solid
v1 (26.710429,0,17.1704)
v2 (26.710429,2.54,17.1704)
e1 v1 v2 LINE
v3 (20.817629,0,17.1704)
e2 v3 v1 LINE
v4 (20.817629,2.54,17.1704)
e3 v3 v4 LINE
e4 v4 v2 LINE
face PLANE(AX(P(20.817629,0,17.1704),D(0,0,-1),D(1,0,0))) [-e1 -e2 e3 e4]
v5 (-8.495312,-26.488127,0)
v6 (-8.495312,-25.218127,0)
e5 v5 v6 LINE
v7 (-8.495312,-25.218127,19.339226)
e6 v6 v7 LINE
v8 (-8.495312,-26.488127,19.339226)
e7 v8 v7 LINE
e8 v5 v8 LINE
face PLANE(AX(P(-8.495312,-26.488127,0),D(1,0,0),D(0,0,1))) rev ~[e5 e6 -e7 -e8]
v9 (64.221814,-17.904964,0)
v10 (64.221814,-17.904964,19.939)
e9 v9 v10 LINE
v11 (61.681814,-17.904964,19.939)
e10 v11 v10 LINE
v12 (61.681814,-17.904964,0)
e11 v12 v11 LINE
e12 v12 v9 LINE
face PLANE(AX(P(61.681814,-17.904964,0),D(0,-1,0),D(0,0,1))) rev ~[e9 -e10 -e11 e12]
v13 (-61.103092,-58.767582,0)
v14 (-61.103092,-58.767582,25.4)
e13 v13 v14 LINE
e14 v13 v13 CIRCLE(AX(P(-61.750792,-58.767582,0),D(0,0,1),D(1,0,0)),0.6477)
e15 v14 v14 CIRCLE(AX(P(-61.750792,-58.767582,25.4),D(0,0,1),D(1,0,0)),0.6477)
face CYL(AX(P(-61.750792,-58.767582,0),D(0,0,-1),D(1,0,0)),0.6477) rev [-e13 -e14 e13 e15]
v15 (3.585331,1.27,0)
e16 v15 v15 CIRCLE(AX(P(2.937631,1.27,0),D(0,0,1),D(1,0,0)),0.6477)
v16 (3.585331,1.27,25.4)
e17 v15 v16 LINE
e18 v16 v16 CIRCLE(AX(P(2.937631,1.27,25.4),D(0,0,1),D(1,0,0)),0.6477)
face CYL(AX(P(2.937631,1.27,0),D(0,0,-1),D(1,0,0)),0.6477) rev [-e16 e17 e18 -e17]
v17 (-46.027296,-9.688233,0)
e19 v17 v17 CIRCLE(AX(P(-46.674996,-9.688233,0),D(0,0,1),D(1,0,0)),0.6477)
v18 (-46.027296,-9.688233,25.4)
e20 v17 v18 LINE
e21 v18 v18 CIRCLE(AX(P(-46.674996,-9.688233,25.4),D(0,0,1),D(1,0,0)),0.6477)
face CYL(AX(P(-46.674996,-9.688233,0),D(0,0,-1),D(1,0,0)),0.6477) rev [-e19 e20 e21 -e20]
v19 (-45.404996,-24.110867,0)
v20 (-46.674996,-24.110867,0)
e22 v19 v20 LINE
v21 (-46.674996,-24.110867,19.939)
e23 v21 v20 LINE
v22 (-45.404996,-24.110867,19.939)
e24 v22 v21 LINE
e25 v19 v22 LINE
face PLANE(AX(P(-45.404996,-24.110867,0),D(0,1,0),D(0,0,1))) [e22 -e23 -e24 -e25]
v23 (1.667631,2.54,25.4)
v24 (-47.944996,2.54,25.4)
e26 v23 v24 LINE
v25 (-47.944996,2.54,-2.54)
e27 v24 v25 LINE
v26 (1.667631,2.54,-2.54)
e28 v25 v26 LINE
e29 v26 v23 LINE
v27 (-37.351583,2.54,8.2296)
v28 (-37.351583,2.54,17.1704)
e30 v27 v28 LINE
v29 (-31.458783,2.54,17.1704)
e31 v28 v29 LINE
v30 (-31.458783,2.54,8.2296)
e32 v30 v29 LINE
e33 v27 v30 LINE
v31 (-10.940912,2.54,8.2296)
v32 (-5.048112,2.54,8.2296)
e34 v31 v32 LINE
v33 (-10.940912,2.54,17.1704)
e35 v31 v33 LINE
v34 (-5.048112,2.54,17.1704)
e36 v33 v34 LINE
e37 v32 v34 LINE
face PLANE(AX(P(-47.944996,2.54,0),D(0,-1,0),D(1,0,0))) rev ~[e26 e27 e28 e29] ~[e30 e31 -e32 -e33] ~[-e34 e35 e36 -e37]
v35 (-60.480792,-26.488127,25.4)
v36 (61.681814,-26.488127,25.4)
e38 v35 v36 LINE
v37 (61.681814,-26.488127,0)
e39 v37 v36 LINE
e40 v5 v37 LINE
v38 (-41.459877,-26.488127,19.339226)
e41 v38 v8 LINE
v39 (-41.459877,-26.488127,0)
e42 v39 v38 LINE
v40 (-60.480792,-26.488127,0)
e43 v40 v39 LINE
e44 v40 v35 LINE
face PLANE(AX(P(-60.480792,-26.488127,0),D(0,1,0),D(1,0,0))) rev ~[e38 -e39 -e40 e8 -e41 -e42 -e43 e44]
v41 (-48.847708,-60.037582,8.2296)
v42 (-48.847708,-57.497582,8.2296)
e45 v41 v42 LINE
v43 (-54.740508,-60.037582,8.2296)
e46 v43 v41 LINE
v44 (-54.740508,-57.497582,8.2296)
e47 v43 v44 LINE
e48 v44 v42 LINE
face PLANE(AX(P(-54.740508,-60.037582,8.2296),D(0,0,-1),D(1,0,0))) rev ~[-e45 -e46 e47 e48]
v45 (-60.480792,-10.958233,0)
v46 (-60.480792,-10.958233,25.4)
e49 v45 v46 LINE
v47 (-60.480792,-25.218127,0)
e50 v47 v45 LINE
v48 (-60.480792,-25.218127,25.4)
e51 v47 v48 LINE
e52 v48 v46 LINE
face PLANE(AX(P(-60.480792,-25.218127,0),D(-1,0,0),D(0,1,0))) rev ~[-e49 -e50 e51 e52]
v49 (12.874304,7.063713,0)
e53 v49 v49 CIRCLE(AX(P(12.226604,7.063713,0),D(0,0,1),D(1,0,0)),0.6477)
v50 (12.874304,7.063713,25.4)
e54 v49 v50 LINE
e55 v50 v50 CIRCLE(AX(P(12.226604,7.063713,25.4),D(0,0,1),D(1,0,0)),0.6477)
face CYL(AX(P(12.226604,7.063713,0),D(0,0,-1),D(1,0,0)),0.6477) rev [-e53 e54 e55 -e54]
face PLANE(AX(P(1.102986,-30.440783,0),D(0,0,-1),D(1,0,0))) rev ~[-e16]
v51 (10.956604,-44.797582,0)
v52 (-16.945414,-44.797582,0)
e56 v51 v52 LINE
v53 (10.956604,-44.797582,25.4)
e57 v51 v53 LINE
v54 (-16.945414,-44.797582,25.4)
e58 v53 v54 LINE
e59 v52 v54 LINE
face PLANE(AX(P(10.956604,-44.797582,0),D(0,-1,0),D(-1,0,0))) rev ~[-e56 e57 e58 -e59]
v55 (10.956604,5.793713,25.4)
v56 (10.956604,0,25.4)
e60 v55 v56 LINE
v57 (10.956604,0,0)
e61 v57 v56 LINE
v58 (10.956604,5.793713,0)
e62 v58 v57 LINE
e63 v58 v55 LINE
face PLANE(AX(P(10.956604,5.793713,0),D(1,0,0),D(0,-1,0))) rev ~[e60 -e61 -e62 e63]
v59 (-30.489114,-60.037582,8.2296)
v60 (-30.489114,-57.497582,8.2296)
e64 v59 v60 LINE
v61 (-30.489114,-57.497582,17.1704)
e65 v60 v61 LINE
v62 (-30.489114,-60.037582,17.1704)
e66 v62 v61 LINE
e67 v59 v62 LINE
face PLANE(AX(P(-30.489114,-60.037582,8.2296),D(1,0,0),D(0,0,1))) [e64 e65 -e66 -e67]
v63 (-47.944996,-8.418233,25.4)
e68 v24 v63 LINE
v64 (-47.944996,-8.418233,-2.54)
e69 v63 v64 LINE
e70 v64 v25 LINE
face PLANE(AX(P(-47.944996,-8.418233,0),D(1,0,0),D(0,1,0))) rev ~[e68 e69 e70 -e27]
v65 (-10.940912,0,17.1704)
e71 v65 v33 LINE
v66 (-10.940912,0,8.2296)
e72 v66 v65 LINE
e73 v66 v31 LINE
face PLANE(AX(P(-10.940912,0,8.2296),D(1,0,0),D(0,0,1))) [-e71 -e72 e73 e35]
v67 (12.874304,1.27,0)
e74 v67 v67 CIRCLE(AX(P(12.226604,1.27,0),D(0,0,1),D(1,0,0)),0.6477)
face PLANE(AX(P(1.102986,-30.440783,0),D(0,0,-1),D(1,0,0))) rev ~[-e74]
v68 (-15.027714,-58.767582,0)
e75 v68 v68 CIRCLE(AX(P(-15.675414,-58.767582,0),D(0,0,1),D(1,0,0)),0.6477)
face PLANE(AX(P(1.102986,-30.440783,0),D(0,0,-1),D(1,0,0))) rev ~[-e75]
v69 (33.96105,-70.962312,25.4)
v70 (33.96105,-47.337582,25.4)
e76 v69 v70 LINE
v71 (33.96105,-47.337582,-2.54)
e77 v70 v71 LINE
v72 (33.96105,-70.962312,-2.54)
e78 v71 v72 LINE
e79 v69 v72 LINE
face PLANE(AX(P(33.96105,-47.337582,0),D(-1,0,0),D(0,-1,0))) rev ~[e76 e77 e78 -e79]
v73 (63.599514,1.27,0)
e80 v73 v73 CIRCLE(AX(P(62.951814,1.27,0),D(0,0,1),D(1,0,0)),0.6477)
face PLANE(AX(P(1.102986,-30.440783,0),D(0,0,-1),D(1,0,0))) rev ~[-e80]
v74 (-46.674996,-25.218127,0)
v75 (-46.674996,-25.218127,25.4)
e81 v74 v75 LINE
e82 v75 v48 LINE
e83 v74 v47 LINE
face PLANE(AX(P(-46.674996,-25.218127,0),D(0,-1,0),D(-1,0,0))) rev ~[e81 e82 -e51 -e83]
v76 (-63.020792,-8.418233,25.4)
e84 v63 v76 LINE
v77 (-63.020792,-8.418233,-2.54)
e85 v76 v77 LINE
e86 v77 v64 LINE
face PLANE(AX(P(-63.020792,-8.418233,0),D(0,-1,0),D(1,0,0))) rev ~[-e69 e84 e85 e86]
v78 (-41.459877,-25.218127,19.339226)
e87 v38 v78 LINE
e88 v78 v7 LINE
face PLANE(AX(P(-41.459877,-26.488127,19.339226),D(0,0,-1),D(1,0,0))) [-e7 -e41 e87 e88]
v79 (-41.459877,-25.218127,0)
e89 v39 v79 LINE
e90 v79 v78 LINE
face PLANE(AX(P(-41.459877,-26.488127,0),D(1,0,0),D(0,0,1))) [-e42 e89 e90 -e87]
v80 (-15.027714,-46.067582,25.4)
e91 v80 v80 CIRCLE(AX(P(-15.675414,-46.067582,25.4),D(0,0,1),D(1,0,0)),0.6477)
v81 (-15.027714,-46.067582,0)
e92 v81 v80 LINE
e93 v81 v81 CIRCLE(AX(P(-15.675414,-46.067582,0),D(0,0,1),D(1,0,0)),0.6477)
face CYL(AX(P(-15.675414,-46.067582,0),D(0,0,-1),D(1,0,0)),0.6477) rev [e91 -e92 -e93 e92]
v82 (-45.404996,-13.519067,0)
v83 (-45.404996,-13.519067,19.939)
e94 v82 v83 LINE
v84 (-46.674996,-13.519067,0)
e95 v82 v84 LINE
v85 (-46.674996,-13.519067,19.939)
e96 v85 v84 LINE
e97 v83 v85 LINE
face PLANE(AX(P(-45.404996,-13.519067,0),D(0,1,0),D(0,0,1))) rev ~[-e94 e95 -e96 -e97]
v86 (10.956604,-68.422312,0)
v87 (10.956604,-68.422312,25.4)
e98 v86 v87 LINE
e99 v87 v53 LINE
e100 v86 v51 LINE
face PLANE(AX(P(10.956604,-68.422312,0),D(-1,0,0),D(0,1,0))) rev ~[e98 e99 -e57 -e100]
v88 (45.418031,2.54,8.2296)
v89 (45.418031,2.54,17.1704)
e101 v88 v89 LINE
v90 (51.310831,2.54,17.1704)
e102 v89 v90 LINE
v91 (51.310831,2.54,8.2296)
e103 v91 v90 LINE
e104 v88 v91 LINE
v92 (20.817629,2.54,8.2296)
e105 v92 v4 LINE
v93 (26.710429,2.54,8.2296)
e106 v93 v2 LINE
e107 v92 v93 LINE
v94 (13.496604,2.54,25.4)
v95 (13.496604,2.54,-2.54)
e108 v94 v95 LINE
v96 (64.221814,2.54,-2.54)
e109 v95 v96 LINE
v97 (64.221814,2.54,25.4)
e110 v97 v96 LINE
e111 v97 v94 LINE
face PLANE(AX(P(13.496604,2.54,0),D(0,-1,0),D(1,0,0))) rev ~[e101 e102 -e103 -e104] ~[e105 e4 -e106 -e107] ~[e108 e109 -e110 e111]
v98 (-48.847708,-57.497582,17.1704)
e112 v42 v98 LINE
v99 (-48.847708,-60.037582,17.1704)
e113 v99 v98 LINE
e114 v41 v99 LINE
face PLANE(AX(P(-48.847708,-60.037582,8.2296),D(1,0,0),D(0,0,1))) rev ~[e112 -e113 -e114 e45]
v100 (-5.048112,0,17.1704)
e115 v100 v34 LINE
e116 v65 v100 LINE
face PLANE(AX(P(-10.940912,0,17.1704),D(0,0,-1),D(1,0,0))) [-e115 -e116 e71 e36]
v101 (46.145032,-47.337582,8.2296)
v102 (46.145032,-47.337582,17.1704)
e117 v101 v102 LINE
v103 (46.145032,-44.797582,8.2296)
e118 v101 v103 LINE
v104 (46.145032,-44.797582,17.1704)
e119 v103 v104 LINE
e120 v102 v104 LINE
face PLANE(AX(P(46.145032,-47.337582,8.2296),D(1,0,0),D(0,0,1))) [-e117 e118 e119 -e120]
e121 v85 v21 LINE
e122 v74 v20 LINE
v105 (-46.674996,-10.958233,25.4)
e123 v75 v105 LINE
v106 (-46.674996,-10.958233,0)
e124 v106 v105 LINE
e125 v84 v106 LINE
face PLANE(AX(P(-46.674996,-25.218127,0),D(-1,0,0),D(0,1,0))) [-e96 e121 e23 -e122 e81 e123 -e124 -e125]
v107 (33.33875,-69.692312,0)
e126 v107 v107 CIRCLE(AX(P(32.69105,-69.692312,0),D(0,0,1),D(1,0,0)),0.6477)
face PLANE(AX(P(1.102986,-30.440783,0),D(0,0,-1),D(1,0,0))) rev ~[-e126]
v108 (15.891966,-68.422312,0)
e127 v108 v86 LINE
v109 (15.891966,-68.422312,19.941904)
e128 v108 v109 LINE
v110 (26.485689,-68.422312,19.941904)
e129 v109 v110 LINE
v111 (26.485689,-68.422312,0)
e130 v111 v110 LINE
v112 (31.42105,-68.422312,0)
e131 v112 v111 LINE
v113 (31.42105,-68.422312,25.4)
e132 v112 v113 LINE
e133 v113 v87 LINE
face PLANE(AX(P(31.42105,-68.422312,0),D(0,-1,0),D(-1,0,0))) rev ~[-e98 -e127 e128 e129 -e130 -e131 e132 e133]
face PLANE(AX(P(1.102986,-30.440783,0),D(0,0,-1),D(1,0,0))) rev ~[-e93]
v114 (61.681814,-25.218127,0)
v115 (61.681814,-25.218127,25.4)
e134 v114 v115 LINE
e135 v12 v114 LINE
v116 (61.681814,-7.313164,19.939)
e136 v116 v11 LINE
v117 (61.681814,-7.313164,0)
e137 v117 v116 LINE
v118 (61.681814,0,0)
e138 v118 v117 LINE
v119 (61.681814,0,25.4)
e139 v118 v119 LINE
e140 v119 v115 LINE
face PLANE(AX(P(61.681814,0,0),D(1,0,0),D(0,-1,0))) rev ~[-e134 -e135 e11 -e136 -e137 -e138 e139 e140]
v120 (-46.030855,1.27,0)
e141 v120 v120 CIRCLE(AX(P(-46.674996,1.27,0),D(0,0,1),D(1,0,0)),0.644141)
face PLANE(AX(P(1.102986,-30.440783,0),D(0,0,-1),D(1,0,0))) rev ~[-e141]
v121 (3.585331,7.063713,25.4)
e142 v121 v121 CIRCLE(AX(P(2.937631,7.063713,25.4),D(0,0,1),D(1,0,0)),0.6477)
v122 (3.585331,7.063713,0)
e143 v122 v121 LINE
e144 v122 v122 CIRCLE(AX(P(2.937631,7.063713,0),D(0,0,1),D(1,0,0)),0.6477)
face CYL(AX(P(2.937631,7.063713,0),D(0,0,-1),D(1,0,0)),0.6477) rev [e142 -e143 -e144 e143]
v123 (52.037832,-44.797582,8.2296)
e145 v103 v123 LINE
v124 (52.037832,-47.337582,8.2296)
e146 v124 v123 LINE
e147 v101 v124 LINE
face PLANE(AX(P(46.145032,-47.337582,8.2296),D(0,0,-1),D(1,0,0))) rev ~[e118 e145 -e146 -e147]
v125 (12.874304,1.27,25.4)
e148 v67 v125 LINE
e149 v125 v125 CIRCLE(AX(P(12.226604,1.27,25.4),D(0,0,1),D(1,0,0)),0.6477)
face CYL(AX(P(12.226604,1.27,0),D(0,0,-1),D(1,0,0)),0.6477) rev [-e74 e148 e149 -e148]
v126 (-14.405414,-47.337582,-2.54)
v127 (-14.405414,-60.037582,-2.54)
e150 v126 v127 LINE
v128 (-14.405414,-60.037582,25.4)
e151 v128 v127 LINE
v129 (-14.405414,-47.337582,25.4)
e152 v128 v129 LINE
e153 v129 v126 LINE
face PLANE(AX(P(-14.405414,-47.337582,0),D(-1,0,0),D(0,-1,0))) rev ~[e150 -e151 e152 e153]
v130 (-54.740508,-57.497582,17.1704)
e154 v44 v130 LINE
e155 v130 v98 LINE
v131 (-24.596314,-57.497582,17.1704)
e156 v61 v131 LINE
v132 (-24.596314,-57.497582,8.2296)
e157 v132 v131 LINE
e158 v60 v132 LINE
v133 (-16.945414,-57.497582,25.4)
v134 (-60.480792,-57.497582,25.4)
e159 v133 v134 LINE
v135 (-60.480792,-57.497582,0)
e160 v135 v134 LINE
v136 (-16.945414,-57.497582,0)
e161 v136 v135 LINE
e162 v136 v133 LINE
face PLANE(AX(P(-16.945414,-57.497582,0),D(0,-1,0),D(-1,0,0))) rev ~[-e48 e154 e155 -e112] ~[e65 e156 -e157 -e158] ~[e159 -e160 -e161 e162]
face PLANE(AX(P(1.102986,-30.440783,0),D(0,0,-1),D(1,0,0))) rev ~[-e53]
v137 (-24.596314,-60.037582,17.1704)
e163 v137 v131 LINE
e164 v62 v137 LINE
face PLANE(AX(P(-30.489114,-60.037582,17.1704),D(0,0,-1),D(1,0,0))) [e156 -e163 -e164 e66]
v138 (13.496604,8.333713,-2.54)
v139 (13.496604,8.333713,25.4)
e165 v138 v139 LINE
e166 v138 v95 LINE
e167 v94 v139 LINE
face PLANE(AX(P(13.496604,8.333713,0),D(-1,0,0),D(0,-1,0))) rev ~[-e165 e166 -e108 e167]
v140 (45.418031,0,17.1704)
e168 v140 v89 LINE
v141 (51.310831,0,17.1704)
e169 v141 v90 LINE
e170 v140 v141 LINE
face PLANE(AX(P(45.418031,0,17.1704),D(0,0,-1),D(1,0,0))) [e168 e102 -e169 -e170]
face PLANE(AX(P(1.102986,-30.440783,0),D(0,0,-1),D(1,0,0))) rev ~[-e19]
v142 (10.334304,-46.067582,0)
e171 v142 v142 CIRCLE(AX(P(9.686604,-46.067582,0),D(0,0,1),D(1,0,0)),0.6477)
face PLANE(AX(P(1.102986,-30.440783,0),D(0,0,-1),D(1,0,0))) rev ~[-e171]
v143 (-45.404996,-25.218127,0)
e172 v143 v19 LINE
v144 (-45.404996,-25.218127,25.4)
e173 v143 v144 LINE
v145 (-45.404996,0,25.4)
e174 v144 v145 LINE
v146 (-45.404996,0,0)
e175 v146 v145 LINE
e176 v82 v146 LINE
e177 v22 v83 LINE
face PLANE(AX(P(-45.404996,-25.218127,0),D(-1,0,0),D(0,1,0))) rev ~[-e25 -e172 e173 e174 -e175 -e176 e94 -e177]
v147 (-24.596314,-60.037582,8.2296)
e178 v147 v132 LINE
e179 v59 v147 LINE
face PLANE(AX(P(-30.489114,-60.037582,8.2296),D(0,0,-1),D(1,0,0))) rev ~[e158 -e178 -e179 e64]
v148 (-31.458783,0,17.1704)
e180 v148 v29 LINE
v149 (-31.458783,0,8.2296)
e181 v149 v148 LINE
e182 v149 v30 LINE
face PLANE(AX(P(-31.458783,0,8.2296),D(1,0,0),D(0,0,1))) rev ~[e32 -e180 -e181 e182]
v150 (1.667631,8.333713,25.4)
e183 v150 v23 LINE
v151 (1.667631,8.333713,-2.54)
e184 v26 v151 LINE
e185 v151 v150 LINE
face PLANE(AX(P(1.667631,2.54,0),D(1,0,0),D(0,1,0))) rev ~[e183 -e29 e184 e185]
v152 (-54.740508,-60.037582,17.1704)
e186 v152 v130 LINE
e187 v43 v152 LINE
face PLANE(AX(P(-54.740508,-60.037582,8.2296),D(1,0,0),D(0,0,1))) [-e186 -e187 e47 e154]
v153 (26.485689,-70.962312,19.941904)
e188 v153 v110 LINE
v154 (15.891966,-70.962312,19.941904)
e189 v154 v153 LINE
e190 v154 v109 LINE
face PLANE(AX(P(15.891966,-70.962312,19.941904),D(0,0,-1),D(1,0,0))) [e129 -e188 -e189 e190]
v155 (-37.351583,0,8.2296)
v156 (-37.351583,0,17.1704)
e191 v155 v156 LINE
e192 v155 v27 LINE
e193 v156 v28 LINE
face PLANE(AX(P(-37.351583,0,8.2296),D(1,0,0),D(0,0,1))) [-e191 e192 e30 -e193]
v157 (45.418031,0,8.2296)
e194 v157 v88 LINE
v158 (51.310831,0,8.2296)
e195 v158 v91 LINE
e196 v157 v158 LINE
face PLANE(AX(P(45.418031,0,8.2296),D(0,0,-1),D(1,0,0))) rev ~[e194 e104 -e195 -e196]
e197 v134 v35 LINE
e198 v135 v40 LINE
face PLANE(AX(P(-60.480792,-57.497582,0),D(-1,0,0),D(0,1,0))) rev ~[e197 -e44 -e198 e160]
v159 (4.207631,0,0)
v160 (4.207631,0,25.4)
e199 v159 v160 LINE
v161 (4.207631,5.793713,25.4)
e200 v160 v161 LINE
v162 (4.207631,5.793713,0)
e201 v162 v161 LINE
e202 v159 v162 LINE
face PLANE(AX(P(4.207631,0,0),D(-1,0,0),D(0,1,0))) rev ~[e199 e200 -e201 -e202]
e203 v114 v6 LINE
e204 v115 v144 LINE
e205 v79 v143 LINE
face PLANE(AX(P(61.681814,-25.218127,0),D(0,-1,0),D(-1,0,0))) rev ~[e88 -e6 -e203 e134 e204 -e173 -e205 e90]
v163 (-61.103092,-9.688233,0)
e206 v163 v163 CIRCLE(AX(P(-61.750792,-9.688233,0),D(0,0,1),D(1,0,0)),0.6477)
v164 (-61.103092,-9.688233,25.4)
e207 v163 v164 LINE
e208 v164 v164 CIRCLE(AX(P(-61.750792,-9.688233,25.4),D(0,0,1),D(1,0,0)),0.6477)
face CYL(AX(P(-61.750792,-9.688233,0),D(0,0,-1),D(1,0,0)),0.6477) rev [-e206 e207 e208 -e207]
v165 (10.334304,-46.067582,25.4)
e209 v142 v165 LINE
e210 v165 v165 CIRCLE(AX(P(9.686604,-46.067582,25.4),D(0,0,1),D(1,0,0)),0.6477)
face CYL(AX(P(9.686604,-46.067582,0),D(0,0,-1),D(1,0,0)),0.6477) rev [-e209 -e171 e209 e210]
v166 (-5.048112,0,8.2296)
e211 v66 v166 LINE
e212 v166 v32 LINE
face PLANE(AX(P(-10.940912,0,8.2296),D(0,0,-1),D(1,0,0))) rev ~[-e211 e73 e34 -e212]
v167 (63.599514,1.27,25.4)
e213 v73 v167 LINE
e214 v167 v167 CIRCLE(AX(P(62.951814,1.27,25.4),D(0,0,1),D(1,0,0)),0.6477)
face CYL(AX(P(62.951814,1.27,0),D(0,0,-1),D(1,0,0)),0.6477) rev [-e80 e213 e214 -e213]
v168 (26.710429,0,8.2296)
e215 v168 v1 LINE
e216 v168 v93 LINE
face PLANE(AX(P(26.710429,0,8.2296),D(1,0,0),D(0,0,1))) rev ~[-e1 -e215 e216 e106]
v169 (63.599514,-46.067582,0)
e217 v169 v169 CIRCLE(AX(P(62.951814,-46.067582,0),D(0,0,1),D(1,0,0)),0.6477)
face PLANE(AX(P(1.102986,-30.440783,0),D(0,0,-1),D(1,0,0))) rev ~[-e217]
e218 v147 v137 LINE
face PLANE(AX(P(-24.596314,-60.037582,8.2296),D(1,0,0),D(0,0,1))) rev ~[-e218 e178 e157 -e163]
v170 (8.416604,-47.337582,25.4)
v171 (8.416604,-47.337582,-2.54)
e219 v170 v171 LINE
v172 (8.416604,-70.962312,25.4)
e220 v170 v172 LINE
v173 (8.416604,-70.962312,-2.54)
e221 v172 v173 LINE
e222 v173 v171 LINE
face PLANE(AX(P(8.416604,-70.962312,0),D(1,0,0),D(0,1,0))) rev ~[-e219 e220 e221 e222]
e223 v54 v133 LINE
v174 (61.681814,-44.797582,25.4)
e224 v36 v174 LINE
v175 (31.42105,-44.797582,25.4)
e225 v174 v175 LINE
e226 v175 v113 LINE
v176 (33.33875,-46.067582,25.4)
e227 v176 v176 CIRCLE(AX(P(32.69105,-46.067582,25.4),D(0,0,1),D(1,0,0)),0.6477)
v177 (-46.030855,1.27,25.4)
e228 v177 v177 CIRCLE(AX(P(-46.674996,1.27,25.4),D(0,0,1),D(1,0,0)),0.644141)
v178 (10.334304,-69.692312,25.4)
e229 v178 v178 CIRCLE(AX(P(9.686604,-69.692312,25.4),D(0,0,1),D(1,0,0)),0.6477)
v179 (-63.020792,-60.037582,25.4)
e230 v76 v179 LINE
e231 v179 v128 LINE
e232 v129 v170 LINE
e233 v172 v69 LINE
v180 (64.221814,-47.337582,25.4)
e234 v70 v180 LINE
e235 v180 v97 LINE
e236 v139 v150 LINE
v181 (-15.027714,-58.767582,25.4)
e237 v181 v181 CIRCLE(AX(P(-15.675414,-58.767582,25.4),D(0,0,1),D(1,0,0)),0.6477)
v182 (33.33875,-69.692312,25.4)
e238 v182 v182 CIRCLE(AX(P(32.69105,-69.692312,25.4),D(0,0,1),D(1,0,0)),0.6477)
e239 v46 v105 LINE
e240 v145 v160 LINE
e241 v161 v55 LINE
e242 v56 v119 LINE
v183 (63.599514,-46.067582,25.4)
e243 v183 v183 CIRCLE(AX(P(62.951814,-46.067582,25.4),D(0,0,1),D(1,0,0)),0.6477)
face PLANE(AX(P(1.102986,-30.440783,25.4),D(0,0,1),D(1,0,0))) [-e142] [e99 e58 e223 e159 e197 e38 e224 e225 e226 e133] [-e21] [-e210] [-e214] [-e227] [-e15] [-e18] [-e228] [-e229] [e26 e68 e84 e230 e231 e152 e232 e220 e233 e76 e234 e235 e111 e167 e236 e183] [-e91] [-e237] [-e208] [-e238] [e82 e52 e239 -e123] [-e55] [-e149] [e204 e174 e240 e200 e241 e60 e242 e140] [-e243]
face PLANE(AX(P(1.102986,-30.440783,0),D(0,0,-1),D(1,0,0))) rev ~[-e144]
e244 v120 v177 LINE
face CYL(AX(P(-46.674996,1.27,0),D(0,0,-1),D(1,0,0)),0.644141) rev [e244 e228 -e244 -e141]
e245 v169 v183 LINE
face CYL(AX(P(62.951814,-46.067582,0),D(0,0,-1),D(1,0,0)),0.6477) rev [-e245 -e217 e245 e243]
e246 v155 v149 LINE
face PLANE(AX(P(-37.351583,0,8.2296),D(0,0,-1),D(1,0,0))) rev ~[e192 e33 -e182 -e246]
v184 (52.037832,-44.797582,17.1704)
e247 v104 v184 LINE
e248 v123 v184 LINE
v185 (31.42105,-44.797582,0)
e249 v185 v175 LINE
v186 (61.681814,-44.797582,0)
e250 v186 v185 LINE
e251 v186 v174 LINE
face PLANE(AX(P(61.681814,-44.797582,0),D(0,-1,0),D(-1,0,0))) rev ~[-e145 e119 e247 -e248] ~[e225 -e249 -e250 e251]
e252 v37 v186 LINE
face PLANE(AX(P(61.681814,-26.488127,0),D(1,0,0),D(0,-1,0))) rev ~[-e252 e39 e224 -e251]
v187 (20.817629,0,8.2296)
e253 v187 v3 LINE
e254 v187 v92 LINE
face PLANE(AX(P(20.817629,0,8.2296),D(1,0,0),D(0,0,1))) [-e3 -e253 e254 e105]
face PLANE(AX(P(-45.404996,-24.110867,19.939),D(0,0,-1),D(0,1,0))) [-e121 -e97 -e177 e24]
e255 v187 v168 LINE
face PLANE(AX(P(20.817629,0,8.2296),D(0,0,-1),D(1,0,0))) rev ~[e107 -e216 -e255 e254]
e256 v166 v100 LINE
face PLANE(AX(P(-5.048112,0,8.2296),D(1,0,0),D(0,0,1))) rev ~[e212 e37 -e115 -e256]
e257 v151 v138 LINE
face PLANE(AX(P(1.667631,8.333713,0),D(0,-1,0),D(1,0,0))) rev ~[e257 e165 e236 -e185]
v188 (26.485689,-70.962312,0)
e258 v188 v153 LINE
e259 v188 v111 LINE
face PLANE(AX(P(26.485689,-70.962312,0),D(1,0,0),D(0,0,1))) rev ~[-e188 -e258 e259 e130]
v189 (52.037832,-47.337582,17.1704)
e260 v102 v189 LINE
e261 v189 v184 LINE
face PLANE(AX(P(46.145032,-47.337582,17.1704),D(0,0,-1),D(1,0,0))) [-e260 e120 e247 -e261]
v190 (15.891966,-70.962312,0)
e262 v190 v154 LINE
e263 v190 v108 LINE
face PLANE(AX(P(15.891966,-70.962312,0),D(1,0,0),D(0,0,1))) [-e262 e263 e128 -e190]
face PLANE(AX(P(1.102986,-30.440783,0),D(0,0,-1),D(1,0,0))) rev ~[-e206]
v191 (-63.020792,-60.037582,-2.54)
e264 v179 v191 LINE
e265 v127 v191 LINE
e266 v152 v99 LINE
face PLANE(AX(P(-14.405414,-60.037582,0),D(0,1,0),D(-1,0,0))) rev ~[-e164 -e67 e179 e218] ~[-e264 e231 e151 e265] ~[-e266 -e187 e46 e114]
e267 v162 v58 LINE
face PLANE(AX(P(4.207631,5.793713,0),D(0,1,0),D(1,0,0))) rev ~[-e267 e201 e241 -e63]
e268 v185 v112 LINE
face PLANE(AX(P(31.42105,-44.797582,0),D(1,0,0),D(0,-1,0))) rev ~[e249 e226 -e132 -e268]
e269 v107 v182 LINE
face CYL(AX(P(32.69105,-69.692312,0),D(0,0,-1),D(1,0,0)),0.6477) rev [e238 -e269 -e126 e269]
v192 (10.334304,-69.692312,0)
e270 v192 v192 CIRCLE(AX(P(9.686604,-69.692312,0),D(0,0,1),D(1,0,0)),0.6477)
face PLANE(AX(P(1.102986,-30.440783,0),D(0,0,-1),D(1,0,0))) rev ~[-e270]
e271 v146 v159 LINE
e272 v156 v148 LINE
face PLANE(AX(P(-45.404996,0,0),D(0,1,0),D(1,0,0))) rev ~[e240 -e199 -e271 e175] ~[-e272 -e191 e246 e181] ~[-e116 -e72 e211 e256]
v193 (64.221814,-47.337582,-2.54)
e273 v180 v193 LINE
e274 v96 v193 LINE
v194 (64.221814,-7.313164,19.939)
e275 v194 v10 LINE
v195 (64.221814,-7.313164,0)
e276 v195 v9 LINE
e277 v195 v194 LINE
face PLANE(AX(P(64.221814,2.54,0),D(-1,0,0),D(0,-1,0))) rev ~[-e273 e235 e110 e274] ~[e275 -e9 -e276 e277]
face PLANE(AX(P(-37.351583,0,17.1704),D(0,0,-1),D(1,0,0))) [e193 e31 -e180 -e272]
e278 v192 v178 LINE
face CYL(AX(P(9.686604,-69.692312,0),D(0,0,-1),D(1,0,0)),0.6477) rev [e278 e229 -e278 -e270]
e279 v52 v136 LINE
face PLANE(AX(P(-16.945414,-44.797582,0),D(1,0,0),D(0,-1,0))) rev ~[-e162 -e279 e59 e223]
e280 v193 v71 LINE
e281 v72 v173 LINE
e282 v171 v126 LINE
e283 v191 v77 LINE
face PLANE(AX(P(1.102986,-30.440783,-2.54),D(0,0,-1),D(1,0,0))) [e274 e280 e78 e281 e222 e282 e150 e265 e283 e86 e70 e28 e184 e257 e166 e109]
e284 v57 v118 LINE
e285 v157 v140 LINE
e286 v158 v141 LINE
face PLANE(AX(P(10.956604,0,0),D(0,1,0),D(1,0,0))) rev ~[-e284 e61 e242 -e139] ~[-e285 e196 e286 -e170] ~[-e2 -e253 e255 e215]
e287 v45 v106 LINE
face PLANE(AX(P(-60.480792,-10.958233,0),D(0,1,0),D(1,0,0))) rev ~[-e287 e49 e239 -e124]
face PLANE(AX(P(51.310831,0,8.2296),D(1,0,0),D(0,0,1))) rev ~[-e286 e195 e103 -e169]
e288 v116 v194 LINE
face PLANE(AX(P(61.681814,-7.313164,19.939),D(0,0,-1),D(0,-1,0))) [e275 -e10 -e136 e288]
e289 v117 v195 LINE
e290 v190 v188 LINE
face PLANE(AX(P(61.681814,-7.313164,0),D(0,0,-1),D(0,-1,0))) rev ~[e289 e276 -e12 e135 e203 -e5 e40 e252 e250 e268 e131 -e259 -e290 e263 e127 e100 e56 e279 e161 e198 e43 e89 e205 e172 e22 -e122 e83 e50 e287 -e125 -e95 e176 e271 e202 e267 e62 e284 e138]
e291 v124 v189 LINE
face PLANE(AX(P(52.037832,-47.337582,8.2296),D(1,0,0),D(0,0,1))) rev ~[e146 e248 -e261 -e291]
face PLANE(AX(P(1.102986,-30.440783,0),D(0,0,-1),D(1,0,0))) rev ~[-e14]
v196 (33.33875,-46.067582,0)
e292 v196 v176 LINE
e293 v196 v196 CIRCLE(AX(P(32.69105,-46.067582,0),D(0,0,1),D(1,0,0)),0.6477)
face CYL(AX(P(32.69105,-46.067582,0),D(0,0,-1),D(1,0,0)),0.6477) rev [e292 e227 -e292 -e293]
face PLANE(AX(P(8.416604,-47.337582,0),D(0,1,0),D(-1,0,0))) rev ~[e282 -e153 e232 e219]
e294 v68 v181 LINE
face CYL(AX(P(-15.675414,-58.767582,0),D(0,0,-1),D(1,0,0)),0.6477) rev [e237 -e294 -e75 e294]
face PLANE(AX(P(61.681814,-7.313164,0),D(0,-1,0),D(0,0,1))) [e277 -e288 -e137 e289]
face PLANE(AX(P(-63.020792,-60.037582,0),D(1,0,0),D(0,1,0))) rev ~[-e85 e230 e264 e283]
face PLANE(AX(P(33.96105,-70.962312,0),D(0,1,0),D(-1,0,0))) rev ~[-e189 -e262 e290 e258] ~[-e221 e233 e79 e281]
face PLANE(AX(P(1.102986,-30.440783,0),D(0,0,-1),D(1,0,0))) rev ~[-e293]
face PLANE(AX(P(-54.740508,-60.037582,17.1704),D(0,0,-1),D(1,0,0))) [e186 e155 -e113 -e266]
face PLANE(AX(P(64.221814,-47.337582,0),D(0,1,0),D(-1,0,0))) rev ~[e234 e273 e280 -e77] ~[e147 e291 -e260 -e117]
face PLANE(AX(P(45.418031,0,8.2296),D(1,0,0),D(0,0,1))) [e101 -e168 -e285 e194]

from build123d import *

# Parameters (mm, degrees)
F0_R      = 0.6477
F0_R_2    = 0.6441405576
F0_W      = 1.27
F0_H      = 14.2598937347
F2_DEPTH  = 25.4
F12_DEPTH = 2.54
F4_W      = 5.8928
F4_H      = 8.9408
F3_W      = 5.8928
F3_H      = 8.9408
F13_DEPTH = 25.4
F6_W      = 5.8928
F6_H      = 8.9408
F5_W      = 10.5937230855
F5_H      = 19.9419036508
F7_W      = 5.8928
F7_H      = 8.9408
F14_DEPTH = 12.7
F10_W     = 10.5918
F10_H     = 19.939
F15_DEPTH = 12.7
F9_W      = 10.5918
F9_H      = 19.939
F16_DEPTH = 25.4
F8_W      = 32.9645648599
F8_H      = 19.3392261863
F17_DEPTH = 12.7


# Not quite as in the source:
# - the program builds the solid bodies; features that only make, move or delete a surface that nothing else refers to are left out


with BuildPart() as f2:
    # F0 (on Top) → F2 (new body)
    with BuildSketch(Plane.XY):
        Polygon((-45.4049956864, 2.54), (-47.9449956864, 2.54), (-47.9449956864, 0), (-47.9449956864, -8.4182334522), (-60.4807920754, -8.4182334522), (-63.0207920754, -8.4182334522), (-63.0207920754, -10.9582334522), (-63.0207920754, -57.4975824572), (-63.0207920754, -60.0375824572), (-60.4807920754, -60.0375824572), (-16.9454139954, -60.0375824572), (-14.4054139954, -60.0375824572), (-14.4054139954, -57.4975824572), (-14.4054139954, -47.3375824572), (8.416604454, -47.3375824572), (8.416604454, -68.4223124651), (8.416604454, -70.9623124651), (10.956604454, -70.9623124651), (31.4210504293, -70.9623124651), (33.9610504293, -70.9623124651), (33.9610504293, -68.4223124651), (33.9610504293, -47.3375824572), (61.6818144917, -47.3375824572), (64.2218144917, -47.3375824572), (64.2218144917, -44.7975824572), (64.2218144917, 0), (64.2218144917, 2.54), (61.6818144917, 2.54), (13.496604454, 2.54), (13.496604454, 5.7937128431), (13.496604454, 8.3337128431), (10.956604454, 8.3337128431), (4.2076310147, 8.3337128431), (1.6676310147, 8.3337128431), (1.6676310147, 5.7937128431), (1.6676310147, 2.54), align=None)
        with Locations((-61.7507920754, -58.7675824572)):
            Circle(F0_R, mode=Mode.SUBTRACT)
        with Locations((-15.6754139954, -58.7675824572)):
            Circle(F0_R, mode=Mode.SUBTRACT)
        with Locations((-15.6754139954, -46.0675824572)):
            Circle(F0_R, mode=Mode.SUBTRACT)
        with Locations((9.686604454, -69.6923124651)):
            Circle(F0_R, mode=Mode.SUBTRACT)
        with Locations((32.6910504293, -69.6923124651)):
            Circle(F0_R, mode=Mode.SUBTRACT)
        with Locations((9.686604454, -46.0675824572)):
            Circle(F0_R, mode=Mode.SUBTRACT)
        with Locations((32.6910504293, -46.0675824572)):
            Circle(F0_R, mode=Mode.SUBTRACT)
        with Locations((62.9518144917, -46.0675824572)):
            Circle(F0_R, mode=Mode.SUBTRACT)
        with Locations((-61.7507920754, -9.6882334522)):
            Circle(F0_R, mode=Mode.SUBTRACT)
        with Locations((-46.6749956864, -9.6882334522)):
            Circle(F0_R, mode=Mode.SUBTRACT)
        with Locations((-46.6749956864, 1.27)):
            Circle(F0_R_2, mode=Mode.SUBTRACT)
        Polygon((10.956604454, -68.4223124651), (10.956604454, -47.3375824572), (10.956604454, -44.7975824572), (8.416604454, -44.7975824572), (-14.4054139954, -44.7975824572), (-16.9454139954, -44.7975824572), (-16.9454139954, -47.3375824572), (-16.9454139954, -57.4975824572), (-60.4807920754, -57.4975824572), (-60.4807920754, -26.4881271869), (-60.4807920754, -25.2181271869), (-60.4807920754, -10.9582334522), (-47.9449956864, -10.9582334522), (-46.6749956864, -10.9582334522), (-45.4049956864, -10.9582334522), (-45.4049956864, -8.4182334522), (-45.4049956864, 0), (1.6676310147, 0), (4.2076310147, 0), (4.2076310147, 2.54), (4.2076310147, 5.7937128431), (10.956604454, 5.7937128431), (10.956604454, 2.54), (10.956604454, 0), (13.496604454, 0), (61.6818144917, 0), (61.6818144917, -25.2181271869), (61.6818144917, -26.4881271869), (61.6818144917, -44.7975824572), (33.9610504293, -44.7975824572), (31.4210504293, -44.7975824572), (31.4210504293, -47.3375824572), (31.4210504293, -68.4223124651), align=None, mode=Mode.SUBTRACT)
        with Locations((2.9376310147, 1.27)):
            Circle(F0_R, mode=Mode.SUBTRACT)
        with Locations((12.226604454, 1.27)):
            Circle(F0_R, mode=Mode.SUBTRACT)
        with Locations((2.9376310147, 7.0637128431)):
            Circle(F0_R, mode=Mode.SUBTRACT)
        with Locations((12.226604454, 7.0637128431)):
            Circle(F0_R, mode=Mode.SUBTRACT)
        with Locations((62.9518144917, 1.27)):
            Circle(F0_R, mode=Mode.SUBTRACT)
        Polygon((-60.4807920754, -26.4881271869), (61.6818144917, -26.4881271869), (61.6818144917, -25.2181271869), (-45.4049956864, -25.2181271869), (-46.6749956864, -25.2181271869), (-60.4807920754, -25.2181271869), align=None)
        with Locations((-46.0399956864, -18.0881803195)):
            Rectangle(F0_W, F0_H)
    extrude(amount=F2_DEPTH)

    # F11 (on face) → F12 (join)
    with BuildSketch(Plane(origin=(0, 0, 0), x_dir=(1, 0, 0), z_dir=(0, 0, -1))):
        Polygon((13.496604454, -8.3337128431), (13.496604454, -2.54), (64.2218144917, -2.54), (64.2218144917, 47.3375824572), (33.9610504293, 47.3375824572), (33.9610504293, 70.9623124651), (8.416604454, 70.9623124651), (8.416604454, 47.3375824572), (-14.4054139954, 47.3375824572), (-14.4054139954, 60.0375824572), (-63.0207920754, 60.0375824572), (-63.0207920754, 8.4182334522), (-47.9449956864, 8.4182334522), (-47.9449956864, -2.54), (1.6676310147, -2.54), (1.6676310147, -8.3337128431), align=None)
    extrude(amount=F12_DEPTH)

    # F4 (on face) + F3 (on face) → F13 (cut)
    with BuildSketch(Plane.XZ):
        with Locations((48.364430666, 12.7)):
            Rectangle(F4_W, F4_H)
        with Locations((23.7640291452, 12.7)):
            Rectangle(F4_W, F4_H)
    with BuildSketch(Plane.XZ):
        with Locations((-7.994512096, 12.7)):
            Rectangle(F3_W, F3_H)
        with Locations((-34.4051830471, 12.7)):
            Rectangle(F3_W, F3_H)
    extrude(amount=-F13_DEPTH, mode=Mode.SUBTRACT)

    # F6 (on face) + F5 (on face) + F7 (on face) → F14 (cut)
    with BuildSketch(Plane.XZ.offset(47.3375824572)):
        with Locations((49.0914324605, 12.7)):
            Rectangle(F6_W, F6_H)
    with BuildSketch(Plane.XZ.offset(70.9623124651)):
        with Locations((21.1888274417, 9.9709518254)):
            Rectangle(F5_W, F5_H)
    with BuildSketch(Plane.XZ.offset(60.0375824572)):
        with Locations((-27.5427140296, 12.7)):
            Rectangle(F7_W, F7_H)
        with Locations((-51.7941080034, 12.7)):
            Rectangle(F7_W, F7_H)
    extrude(amount=-F14_DEPTH, mode=Mode.SUBTRACT)

    # F10 (on face) → F15 (cut)
    with BuildSketch(Plane.YZ.offset(-45.4049956864)):
        with Locations((-18.8149667105, 9.9695)):
            Rectangle(F10_W, F10_H)
    extrude(amount=-F15_DEPTH, mode=Mode.SUBTRACT)

    # F9 (on face) → F16 (cut)
    with BuildSketch(Plane(origin=(61.6818144917, 0, 0), x_dir=(0, -1, 0), z_dir=(-1, 0, 0))):
        with Locations((12.6090635934, 9.9695)):
            Rectangle(F9_W, F9_H)
    extrude(amount=-F16_DEPTH, mode=Mode.SUBTRACT)

    # F8 (on face) → F17 (cut)
    with BuildSketch(Plane.XZ.offset(26.4881271869)):
        with Locations((-24.977594614, 9.6696130931)):
            Rectangle(F8_W, F8_H)
    extrude(amount=-F17_DEPTH, mode=Mode.SUBTRACT)


solid = f2.part
